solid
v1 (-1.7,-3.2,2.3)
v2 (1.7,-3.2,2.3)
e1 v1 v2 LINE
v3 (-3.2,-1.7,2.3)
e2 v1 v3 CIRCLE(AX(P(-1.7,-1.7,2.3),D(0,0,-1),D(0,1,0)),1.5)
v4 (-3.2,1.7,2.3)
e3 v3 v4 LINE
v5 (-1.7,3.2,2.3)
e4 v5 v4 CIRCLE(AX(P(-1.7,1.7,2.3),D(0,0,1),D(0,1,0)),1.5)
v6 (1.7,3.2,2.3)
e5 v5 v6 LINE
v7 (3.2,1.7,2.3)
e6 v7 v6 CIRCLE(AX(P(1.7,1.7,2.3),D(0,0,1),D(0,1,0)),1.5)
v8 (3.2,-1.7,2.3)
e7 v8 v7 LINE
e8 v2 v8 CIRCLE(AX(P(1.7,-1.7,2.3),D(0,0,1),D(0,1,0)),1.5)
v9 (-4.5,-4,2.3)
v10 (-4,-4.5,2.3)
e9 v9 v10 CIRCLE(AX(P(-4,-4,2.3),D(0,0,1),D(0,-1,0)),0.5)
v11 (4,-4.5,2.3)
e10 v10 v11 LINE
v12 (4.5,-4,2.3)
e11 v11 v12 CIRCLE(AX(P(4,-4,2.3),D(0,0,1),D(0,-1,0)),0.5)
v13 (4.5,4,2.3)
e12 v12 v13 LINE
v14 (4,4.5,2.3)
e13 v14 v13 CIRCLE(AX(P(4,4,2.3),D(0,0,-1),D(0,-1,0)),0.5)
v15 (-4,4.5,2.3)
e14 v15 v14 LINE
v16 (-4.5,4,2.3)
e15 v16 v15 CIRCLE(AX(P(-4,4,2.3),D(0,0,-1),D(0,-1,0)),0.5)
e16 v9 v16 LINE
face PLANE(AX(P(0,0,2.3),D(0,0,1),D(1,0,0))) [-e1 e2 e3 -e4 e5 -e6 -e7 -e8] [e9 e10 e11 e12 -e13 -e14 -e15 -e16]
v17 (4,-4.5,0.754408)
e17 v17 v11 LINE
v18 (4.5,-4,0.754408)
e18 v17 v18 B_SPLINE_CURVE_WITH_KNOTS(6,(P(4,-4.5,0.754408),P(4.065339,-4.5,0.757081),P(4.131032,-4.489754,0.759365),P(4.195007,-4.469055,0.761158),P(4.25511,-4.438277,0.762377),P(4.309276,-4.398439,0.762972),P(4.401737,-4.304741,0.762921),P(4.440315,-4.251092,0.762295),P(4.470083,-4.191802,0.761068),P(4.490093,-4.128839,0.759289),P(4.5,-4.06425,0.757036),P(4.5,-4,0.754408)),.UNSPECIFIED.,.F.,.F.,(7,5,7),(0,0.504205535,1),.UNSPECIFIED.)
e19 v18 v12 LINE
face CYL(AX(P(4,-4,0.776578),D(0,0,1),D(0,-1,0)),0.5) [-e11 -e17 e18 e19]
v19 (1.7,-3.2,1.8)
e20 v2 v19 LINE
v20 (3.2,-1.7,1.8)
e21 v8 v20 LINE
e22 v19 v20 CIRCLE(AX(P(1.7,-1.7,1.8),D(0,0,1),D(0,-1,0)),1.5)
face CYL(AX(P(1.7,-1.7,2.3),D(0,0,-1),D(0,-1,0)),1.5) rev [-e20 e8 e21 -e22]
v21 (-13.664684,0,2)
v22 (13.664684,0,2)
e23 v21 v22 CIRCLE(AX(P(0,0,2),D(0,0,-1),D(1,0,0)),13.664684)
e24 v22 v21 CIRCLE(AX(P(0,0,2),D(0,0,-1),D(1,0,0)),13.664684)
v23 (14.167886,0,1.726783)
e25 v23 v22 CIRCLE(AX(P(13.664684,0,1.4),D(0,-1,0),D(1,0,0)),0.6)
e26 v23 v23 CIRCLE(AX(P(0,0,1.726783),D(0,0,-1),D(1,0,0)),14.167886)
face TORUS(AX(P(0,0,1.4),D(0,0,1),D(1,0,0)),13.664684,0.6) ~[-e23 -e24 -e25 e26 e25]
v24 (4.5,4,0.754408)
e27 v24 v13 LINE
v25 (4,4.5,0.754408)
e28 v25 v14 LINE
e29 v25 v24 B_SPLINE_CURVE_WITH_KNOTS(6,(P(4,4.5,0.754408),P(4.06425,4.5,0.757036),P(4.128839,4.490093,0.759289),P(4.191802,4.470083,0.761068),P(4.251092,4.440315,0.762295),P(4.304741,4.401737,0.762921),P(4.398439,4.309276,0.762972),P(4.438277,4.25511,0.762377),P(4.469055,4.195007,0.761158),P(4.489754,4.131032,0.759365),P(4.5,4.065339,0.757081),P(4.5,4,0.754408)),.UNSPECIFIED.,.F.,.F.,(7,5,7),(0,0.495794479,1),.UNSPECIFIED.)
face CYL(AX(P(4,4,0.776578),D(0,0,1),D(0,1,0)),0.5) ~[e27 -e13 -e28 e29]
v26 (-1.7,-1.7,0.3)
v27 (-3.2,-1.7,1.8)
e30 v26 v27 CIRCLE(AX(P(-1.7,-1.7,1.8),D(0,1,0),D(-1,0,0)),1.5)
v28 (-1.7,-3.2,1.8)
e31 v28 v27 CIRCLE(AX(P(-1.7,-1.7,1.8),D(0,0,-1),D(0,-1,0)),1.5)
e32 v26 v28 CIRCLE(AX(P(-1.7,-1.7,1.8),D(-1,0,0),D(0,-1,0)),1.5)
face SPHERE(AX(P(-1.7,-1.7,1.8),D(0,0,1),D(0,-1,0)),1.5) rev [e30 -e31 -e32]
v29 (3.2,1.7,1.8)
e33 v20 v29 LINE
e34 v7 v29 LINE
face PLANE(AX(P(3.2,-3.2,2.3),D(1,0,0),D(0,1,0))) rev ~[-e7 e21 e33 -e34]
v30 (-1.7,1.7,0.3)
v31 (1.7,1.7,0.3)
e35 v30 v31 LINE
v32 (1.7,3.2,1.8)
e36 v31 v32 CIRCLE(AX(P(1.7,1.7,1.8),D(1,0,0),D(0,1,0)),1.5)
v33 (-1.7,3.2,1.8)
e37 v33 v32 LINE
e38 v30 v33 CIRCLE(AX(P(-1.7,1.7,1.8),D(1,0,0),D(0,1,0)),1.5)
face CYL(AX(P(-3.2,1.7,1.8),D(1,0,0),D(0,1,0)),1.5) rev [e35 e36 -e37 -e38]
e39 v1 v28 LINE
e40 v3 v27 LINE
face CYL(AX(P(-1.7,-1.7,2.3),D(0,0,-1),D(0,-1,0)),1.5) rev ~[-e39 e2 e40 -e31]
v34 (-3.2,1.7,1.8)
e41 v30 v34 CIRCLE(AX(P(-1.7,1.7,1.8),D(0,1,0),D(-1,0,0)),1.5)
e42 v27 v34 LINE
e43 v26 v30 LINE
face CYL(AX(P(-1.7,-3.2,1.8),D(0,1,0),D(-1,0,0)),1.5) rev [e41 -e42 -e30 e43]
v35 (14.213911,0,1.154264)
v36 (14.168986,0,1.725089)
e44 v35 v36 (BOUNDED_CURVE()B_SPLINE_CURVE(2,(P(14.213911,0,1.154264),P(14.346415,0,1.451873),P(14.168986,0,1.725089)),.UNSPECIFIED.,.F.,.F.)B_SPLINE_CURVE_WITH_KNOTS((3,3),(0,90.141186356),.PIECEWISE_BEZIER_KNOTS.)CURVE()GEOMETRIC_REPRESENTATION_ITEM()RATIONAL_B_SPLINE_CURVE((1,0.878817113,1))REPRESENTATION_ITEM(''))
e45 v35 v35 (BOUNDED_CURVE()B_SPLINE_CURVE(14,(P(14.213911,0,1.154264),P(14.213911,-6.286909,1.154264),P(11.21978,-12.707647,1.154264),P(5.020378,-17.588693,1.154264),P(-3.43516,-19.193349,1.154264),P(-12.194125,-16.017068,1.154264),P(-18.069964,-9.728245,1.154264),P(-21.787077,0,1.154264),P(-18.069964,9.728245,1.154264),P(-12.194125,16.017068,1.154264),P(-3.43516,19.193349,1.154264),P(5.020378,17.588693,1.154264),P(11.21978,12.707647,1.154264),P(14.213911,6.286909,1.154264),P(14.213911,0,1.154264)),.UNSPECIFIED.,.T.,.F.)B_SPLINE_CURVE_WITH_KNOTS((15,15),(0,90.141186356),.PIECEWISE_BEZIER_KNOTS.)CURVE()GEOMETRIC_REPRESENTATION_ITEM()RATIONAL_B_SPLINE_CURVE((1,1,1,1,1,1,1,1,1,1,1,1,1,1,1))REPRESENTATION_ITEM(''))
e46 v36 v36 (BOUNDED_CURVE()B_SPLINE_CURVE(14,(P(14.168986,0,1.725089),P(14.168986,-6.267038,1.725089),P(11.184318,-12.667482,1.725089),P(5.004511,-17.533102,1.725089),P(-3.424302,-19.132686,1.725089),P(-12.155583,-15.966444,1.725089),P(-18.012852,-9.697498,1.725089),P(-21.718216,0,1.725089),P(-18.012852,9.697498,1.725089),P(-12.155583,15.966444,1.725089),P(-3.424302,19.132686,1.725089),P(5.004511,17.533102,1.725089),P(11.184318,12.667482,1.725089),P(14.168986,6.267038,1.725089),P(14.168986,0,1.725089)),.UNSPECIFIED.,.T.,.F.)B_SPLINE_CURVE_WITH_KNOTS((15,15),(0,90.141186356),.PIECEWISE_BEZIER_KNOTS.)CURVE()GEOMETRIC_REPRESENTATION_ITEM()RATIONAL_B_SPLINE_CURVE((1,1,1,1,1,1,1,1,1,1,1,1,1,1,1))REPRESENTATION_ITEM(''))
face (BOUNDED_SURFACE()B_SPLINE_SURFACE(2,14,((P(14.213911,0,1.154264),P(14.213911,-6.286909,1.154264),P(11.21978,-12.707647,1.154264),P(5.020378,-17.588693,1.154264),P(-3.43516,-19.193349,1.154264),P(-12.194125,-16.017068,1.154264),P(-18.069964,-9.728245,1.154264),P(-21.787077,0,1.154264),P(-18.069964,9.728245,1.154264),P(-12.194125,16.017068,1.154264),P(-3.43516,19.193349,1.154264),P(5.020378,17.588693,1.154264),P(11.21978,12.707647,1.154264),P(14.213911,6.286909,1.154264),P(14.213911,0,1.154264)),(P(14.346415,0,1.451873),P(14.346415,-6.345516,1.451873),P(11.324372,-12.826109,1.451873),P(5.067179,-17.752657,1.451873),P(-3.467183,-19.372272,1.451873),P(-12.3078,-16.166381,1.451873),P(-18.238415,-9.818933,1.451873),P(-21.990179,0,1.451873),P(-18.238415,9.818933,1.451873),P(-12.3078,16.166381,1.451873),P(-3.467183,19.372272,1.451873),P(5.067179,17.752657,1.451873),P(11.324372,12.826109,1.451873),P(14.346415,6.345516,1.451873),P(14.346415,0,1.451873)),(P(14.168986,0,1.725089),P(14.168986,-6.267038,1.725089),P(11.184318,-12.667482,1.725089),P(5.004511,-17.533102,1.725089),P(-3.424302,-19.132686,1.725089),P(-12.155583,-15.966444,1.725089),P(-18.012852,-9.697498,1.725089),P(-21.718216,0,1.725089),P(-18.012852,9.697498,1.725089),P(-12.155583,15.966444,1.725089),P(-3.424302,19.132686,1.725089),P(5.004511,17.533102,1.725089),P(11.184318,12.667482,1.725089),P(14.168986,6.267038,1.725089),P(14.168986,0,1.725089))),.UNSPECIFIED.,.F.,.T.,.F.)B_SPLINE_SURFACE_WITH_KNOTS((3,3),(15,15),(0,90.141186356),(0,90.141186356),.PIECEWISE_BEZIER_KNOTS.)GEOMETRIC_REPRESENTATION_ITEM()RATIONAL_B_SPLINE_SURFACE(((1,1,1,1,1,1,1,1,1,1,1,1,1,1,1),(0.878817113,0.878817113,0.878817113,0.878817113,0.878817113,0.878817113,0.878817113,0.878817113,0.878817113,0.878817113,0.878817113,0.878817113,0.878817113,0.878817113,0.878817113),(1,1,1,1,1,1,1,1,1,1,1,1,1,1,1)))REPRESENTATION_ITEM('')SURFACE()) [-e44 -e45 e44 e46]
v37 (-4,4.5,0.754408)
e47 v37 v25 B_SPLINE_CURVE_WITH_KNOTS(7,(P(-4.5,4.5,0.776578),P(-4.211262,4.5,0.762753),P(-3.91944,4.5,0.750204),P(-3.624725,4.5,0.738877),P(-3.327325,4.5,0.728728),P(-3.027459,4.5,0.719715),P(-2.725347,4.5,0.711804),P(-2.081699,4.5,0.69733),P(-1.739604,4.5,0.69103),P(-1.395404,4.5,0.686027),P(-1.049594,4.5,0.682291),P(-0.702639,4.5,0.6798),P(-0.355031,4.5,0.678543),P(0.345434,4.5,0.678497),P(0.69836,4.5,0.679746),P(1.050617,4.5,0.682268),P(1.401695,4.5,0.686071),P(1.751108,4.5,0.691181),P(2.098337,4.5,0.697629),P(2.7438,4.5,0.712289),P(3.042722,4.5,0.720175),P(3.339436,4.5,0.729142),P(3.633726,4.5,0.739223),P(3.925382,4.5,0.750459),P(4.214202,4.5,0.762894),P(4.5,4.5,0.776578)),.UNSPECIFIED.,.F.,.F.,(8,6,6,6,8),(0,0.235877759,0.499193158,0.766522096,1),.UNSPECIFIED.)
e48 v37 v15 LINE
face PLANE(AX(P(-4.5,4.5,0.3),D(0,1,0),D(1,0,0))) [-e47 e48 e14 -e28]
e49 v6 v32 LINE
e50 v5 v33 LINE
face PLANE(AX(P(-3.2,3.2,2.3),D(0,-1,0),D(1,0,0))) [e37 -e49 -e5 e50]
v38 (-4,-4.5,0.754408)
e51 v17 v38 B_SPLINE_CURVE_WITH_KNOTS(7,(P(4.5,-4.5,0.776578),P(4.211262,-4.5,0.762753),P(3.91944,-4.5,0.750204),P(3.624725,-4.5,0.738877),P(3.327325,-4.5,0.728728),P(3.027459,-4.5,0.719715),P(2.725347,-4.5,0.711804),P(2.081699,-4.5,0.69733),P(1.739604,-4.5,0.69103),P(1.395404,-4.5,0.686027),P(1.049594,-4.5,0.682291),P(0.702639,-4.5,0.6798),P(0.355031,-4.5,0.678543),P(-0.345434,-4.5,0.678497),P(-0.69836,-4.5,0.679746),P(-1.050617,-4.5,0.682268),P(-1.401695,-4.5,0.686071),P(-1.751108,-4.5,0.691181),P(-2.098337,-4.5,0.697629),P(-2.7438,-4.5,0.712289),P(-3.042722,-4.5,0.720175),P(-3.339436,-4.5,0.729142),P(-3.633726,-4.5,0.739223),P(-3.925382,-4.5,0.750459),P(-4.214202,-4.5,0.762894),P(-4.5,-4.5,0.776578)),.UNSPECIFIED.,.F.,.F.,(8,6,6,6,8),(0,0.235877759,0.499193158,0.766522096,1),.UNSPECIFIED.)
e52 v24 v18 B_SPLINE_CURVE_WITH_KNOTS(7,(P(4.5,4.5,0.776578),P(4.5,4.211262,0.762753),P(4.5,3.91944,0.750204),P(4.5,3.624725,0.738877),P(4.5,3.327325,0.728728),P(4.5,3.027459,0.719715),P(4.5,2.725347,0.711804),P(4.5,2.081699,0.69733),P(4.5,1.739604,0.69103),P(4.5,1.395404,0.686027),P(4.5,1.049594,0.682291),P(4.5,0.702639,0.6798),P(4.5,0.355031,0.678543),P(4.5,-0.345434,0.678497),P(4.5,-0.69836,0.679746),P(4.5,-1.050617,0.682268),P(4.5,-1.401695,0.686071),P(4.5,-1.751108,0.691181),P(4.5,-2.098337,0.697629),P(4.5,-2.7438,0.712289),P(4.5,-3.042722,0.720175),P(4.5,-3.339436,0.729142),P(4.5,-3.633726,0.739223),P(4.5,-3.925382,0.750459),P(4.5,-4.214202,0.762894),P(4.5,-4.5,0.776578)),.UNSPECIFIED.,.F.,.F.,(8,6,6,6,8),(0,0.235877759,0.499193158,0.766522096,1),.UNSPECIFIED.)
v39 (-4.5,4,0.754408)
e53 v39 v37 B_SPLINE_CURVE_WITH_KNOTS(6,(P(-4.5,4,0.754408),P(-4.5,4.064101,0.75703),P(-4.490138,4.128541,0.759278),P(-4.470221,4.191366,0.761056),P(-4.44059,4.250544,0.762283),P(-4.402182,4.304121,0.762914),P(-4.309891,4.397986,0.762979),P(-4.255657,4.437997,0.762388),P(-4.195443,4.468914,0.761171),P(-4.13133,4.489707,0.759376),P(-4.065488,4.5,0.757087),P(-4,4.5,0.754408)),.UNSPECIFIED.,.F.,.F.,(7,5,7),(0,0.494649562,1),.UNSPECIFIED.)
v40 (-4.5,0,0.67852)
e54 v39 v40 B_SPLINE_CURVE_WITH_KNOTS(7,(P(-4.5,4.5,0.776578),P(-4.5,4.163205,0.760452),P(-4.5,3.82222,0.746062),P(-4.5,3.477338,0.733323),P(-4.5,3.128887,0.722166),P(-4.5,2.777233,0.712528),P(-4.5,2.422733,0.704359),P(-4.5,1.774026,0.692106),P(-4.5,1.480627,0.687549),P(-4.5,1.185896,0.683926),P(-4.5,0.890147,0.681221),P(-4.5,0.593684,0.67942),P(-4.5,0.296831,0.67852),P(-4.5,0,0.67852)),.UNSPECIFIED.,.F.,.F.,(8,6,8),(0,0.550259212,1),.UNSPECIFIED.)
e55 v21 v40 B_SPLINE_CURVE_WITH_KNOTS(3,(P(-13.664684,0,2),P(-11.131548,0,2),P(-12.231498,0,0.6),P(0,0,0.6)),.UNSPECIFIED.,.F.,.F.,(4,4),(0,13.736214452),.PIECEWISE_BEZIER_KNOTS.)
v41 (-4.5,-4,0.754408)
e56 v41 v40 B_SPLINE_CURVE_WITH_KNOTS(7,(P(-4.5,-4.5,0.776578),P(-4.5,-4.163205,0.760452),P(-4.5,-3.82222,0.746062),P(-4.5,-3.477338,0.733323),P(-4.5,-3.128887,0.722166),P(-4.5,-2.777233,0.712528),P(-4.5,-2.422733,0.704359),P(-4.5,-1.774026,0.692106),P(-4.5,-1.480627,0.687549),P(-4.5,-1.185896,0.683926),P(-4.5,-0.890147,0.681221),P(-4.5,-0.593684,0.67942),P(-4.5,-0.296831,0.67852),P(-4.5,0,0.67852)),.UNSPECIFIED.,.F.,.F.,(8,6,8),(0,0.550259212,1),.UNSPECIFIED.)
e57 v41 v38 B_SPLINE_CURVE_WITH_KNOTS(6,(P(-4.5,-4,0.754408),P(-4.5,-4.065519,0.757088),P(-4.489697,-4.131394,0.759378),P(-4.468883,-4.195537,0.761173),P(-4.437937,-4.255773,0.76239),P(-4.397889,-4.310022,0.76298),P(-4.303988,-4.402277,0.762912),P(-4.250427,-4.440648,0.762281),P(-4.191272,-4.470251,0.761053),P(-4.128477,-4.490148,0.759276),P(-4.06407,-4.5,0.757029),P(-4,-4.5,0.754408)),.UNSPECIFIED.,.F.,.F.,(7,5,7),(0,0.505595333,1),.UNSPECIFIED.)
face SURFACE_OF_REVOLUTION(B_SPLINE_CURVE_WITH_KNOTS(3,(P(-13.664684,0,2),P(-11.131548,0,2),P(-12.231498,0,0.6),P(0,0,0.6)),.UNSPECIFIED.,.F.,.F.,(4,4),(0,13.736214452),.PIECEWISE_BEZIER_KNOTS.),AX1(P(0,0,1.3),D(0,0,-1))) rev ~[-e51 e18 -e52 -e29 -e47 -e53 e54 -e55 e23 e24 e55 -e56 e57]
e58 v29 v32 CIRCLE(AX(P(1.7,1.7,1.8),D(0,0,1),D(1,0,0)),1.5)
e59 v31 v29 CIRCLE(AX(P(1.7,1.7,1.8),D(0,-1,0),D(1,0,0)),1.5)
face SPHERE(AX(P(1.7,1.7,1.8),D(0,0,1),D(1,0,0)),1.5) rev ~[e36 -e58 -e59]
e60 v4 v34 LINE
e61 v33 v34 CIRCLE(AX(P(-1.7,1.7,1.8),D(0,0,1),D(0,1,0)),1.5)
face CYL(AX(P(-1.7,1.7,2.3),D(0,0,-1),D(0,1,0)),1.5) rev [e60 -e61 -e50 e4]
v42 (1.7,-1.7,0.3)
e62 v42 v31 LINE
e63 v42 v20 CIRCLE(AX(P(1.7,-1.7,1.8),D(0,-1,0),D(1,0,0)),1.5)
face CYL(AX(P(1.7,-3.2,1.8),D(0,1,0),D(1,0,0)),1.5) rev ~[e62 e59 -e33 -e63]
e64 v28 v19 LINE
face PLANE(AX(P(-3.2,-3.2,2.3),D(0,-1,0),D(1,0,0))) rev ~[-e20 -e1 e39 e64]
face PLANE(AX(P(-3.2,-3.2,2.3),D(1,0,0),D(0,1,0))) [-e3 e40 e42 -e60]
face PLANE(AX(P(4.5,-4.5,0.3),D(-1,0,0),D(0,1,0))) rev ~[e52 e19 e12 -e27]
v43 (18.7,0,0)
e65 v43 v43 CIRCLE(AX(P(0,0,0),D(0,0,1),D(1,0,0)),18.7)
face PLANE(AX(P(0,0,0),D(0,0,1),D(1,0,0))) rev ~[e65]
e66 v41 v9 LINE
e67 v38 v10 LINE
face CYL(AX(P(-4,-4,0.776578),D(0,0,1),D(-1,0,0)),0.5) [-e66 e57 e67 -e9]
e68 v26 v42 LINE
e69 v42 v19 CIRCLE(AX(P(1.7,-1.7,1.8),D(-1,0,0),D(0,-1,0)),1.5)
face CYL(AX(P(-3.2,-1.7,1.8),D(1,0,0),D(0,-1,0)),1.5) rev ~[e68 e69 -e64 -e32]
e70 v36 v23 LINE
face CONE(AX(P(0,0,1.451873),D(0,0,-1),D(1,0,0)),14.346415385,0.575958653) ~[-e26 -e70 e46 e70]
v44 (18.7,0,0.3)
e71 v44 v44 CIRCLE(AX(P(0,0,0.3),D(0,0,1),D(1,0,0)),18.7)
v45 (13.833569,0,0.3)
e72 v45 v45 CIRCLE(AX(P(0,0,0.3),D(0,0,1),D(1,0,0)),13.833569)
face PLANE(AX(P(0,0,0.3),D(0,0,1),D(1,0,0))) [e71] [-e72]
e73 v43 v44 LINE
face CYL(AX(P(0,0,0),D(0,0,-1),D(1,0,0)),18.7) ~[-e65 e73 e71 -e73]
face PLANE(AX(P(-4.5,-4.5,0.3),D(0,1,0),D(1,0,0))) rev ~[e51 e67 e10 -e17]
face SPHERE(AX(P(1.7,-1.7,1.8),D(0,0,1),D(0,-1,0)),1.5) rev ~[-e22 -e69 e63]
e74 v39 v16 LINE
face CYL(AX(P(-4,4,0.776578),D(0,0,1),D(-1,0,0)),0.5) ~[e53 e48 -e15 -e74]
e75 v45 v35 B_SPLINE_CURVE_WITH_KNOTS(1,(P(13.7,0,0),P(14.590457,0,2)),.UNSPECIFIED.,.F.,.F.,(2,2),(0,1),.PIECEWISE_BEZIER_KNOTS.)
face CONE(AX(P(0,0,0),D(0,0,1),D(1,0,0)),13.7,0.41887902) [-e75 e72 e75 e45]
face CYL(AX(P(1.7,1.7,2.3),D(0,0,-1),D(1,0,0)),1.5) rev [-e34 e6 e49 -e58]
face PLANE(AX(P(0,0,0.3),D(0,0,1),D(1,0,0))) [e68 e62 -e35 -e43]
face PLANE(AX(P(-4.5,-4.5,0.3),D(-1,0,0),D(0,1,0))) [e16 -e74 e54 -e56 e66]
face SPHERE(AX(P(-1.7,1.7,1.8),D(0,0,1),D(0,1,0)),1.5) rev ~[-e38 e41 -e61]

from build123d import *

# Parameters (mm, degrees)
F0_R      = 18.7
F0_R_2    = 13.7
F1_DEPTH  = 0.3
F2_DEPTH  = 2
F2_TAPER  = -24
F4_R      = 0.6
F8_W      = 9
F8_H      = 9
F9_DEPTH  = 2
F10_R     = 0.5
F11_W     = 6.4
F11_H     = 6.4
F12_DEPTH = 2
F13_R     = 1.5


# Not quite as in the source:
# - a fillet or chamfer that OpenCascade refuses, or shapes differently, is made with other operations: its cross-section is extruded or revolved along the edge and cut away or added


with BuildPart() as f1:
    # F0 (on Top) → F1 (new body)
    with BuildSketch(Plane.XY):
        Circle(F0_R)
        Circle(F0_R_2, mode=Mode.SUBTRACT)
        Circle(F0_R_2)
    extrude(amount=F1_DEPTH)

    # F0 (on Top) → F2 (join)
    with BuildSketch(Plane.XY):
        Circle(F0_R_2)
    extrude(amount=F2_DEPTH, taper=F2_TAPER)

    # F3: chamfer of 0.6 on 1 edges, made by hand

    # F3_s1 → F3_t2 (revolve, cut)
    with BuildSketch(Plane.XZ):
        Polygon((14.3464153848, 1.4518727254), (13.9904573706, 2), (14.5904573706, 2), align=None)
    revolve(axis=Axis((0, 0, 2), (0, 0, -1)), mode=Mode.SUBTRACT)

    # F4
    f4_edges = [f1.edges().sort_by_distance(p)[0] for p in [
        (-14.346415, 0, 1.451873),
        (-13.990457, 0, 2),
    ]]
    fillet(f4_edges, radius=F4_R)


with BuildPart() as f6:
    # F5 (on Front) → F6 (revolve)
    with BuildSketch(Plane.XZ):
        with BuildLine():
            Line((0, 2), (-13.6646839508, 2))
            add(Edge.make_bspline(
                [(-13.6646839508, 2), (-11.1315483197, 2), (-12.2314980254, 0.6), (0, 0.6)],
                knots=[0, 0, 0, 0, 13.7362144522, 13.7362144522, 13.7362144522, 13.7362144522], degree=3))
            Line((0, 0.6), (0, 2))
        make_face()
    revolve(axis=Axis((0, 0, 1.3), (0, 0, -1)))


with BuildPart() as f1_1:
    add(f1.part)

    # F7: cut F6
    add(f6.part, mode=Mode.SUBTRACT)

    # F8 (on face) → F9 (join)
    with BuildSketch(Plane.XY.offset(0.3)):
        Rectangle(F8_W, F8_H)
    extrude(amount=F9_DEPTH)

    # F10
    f10_edges = [f1_1.edges().sort_by_distance(p)[0] for p in [
        (-4.5, 4.5, 1.538289),
        (-4.5, -4.5, 1.538289),
        (4.5, -4.5, 1.538289),
        (4.5, 4.5, 1.538289),
    ]]
    fillet(f10_edges, radius=F10_R)

    # F11 (on face) → F12 (cut, through all)
    with BuildSketch(Plane.XY.offset(2.3)):
        Rectangle(F11_W, F11_H)
    extrude(amount=-F12_DEPTH, mode=Mode.SUBTRACT)

    # F13
    f13_edges = [f1_1.edges().sort_by_distance(p)[0] for p in [
        (-3.2, 3.2, 1.3),
        (3.2, 3.2, 1.3),
        (3.2, -3.2, 1.3),
        (-3.2, -3.2, 1.3),
        (0, -3.2, 0.3),
        (3.2, 0, 0.3),
        (0, 3.2, 0.3),
        (-3.2, 0, 0.3),
    ]]
    fillet(f13_edges, radius=F13_R)


solid = f1_1.part
